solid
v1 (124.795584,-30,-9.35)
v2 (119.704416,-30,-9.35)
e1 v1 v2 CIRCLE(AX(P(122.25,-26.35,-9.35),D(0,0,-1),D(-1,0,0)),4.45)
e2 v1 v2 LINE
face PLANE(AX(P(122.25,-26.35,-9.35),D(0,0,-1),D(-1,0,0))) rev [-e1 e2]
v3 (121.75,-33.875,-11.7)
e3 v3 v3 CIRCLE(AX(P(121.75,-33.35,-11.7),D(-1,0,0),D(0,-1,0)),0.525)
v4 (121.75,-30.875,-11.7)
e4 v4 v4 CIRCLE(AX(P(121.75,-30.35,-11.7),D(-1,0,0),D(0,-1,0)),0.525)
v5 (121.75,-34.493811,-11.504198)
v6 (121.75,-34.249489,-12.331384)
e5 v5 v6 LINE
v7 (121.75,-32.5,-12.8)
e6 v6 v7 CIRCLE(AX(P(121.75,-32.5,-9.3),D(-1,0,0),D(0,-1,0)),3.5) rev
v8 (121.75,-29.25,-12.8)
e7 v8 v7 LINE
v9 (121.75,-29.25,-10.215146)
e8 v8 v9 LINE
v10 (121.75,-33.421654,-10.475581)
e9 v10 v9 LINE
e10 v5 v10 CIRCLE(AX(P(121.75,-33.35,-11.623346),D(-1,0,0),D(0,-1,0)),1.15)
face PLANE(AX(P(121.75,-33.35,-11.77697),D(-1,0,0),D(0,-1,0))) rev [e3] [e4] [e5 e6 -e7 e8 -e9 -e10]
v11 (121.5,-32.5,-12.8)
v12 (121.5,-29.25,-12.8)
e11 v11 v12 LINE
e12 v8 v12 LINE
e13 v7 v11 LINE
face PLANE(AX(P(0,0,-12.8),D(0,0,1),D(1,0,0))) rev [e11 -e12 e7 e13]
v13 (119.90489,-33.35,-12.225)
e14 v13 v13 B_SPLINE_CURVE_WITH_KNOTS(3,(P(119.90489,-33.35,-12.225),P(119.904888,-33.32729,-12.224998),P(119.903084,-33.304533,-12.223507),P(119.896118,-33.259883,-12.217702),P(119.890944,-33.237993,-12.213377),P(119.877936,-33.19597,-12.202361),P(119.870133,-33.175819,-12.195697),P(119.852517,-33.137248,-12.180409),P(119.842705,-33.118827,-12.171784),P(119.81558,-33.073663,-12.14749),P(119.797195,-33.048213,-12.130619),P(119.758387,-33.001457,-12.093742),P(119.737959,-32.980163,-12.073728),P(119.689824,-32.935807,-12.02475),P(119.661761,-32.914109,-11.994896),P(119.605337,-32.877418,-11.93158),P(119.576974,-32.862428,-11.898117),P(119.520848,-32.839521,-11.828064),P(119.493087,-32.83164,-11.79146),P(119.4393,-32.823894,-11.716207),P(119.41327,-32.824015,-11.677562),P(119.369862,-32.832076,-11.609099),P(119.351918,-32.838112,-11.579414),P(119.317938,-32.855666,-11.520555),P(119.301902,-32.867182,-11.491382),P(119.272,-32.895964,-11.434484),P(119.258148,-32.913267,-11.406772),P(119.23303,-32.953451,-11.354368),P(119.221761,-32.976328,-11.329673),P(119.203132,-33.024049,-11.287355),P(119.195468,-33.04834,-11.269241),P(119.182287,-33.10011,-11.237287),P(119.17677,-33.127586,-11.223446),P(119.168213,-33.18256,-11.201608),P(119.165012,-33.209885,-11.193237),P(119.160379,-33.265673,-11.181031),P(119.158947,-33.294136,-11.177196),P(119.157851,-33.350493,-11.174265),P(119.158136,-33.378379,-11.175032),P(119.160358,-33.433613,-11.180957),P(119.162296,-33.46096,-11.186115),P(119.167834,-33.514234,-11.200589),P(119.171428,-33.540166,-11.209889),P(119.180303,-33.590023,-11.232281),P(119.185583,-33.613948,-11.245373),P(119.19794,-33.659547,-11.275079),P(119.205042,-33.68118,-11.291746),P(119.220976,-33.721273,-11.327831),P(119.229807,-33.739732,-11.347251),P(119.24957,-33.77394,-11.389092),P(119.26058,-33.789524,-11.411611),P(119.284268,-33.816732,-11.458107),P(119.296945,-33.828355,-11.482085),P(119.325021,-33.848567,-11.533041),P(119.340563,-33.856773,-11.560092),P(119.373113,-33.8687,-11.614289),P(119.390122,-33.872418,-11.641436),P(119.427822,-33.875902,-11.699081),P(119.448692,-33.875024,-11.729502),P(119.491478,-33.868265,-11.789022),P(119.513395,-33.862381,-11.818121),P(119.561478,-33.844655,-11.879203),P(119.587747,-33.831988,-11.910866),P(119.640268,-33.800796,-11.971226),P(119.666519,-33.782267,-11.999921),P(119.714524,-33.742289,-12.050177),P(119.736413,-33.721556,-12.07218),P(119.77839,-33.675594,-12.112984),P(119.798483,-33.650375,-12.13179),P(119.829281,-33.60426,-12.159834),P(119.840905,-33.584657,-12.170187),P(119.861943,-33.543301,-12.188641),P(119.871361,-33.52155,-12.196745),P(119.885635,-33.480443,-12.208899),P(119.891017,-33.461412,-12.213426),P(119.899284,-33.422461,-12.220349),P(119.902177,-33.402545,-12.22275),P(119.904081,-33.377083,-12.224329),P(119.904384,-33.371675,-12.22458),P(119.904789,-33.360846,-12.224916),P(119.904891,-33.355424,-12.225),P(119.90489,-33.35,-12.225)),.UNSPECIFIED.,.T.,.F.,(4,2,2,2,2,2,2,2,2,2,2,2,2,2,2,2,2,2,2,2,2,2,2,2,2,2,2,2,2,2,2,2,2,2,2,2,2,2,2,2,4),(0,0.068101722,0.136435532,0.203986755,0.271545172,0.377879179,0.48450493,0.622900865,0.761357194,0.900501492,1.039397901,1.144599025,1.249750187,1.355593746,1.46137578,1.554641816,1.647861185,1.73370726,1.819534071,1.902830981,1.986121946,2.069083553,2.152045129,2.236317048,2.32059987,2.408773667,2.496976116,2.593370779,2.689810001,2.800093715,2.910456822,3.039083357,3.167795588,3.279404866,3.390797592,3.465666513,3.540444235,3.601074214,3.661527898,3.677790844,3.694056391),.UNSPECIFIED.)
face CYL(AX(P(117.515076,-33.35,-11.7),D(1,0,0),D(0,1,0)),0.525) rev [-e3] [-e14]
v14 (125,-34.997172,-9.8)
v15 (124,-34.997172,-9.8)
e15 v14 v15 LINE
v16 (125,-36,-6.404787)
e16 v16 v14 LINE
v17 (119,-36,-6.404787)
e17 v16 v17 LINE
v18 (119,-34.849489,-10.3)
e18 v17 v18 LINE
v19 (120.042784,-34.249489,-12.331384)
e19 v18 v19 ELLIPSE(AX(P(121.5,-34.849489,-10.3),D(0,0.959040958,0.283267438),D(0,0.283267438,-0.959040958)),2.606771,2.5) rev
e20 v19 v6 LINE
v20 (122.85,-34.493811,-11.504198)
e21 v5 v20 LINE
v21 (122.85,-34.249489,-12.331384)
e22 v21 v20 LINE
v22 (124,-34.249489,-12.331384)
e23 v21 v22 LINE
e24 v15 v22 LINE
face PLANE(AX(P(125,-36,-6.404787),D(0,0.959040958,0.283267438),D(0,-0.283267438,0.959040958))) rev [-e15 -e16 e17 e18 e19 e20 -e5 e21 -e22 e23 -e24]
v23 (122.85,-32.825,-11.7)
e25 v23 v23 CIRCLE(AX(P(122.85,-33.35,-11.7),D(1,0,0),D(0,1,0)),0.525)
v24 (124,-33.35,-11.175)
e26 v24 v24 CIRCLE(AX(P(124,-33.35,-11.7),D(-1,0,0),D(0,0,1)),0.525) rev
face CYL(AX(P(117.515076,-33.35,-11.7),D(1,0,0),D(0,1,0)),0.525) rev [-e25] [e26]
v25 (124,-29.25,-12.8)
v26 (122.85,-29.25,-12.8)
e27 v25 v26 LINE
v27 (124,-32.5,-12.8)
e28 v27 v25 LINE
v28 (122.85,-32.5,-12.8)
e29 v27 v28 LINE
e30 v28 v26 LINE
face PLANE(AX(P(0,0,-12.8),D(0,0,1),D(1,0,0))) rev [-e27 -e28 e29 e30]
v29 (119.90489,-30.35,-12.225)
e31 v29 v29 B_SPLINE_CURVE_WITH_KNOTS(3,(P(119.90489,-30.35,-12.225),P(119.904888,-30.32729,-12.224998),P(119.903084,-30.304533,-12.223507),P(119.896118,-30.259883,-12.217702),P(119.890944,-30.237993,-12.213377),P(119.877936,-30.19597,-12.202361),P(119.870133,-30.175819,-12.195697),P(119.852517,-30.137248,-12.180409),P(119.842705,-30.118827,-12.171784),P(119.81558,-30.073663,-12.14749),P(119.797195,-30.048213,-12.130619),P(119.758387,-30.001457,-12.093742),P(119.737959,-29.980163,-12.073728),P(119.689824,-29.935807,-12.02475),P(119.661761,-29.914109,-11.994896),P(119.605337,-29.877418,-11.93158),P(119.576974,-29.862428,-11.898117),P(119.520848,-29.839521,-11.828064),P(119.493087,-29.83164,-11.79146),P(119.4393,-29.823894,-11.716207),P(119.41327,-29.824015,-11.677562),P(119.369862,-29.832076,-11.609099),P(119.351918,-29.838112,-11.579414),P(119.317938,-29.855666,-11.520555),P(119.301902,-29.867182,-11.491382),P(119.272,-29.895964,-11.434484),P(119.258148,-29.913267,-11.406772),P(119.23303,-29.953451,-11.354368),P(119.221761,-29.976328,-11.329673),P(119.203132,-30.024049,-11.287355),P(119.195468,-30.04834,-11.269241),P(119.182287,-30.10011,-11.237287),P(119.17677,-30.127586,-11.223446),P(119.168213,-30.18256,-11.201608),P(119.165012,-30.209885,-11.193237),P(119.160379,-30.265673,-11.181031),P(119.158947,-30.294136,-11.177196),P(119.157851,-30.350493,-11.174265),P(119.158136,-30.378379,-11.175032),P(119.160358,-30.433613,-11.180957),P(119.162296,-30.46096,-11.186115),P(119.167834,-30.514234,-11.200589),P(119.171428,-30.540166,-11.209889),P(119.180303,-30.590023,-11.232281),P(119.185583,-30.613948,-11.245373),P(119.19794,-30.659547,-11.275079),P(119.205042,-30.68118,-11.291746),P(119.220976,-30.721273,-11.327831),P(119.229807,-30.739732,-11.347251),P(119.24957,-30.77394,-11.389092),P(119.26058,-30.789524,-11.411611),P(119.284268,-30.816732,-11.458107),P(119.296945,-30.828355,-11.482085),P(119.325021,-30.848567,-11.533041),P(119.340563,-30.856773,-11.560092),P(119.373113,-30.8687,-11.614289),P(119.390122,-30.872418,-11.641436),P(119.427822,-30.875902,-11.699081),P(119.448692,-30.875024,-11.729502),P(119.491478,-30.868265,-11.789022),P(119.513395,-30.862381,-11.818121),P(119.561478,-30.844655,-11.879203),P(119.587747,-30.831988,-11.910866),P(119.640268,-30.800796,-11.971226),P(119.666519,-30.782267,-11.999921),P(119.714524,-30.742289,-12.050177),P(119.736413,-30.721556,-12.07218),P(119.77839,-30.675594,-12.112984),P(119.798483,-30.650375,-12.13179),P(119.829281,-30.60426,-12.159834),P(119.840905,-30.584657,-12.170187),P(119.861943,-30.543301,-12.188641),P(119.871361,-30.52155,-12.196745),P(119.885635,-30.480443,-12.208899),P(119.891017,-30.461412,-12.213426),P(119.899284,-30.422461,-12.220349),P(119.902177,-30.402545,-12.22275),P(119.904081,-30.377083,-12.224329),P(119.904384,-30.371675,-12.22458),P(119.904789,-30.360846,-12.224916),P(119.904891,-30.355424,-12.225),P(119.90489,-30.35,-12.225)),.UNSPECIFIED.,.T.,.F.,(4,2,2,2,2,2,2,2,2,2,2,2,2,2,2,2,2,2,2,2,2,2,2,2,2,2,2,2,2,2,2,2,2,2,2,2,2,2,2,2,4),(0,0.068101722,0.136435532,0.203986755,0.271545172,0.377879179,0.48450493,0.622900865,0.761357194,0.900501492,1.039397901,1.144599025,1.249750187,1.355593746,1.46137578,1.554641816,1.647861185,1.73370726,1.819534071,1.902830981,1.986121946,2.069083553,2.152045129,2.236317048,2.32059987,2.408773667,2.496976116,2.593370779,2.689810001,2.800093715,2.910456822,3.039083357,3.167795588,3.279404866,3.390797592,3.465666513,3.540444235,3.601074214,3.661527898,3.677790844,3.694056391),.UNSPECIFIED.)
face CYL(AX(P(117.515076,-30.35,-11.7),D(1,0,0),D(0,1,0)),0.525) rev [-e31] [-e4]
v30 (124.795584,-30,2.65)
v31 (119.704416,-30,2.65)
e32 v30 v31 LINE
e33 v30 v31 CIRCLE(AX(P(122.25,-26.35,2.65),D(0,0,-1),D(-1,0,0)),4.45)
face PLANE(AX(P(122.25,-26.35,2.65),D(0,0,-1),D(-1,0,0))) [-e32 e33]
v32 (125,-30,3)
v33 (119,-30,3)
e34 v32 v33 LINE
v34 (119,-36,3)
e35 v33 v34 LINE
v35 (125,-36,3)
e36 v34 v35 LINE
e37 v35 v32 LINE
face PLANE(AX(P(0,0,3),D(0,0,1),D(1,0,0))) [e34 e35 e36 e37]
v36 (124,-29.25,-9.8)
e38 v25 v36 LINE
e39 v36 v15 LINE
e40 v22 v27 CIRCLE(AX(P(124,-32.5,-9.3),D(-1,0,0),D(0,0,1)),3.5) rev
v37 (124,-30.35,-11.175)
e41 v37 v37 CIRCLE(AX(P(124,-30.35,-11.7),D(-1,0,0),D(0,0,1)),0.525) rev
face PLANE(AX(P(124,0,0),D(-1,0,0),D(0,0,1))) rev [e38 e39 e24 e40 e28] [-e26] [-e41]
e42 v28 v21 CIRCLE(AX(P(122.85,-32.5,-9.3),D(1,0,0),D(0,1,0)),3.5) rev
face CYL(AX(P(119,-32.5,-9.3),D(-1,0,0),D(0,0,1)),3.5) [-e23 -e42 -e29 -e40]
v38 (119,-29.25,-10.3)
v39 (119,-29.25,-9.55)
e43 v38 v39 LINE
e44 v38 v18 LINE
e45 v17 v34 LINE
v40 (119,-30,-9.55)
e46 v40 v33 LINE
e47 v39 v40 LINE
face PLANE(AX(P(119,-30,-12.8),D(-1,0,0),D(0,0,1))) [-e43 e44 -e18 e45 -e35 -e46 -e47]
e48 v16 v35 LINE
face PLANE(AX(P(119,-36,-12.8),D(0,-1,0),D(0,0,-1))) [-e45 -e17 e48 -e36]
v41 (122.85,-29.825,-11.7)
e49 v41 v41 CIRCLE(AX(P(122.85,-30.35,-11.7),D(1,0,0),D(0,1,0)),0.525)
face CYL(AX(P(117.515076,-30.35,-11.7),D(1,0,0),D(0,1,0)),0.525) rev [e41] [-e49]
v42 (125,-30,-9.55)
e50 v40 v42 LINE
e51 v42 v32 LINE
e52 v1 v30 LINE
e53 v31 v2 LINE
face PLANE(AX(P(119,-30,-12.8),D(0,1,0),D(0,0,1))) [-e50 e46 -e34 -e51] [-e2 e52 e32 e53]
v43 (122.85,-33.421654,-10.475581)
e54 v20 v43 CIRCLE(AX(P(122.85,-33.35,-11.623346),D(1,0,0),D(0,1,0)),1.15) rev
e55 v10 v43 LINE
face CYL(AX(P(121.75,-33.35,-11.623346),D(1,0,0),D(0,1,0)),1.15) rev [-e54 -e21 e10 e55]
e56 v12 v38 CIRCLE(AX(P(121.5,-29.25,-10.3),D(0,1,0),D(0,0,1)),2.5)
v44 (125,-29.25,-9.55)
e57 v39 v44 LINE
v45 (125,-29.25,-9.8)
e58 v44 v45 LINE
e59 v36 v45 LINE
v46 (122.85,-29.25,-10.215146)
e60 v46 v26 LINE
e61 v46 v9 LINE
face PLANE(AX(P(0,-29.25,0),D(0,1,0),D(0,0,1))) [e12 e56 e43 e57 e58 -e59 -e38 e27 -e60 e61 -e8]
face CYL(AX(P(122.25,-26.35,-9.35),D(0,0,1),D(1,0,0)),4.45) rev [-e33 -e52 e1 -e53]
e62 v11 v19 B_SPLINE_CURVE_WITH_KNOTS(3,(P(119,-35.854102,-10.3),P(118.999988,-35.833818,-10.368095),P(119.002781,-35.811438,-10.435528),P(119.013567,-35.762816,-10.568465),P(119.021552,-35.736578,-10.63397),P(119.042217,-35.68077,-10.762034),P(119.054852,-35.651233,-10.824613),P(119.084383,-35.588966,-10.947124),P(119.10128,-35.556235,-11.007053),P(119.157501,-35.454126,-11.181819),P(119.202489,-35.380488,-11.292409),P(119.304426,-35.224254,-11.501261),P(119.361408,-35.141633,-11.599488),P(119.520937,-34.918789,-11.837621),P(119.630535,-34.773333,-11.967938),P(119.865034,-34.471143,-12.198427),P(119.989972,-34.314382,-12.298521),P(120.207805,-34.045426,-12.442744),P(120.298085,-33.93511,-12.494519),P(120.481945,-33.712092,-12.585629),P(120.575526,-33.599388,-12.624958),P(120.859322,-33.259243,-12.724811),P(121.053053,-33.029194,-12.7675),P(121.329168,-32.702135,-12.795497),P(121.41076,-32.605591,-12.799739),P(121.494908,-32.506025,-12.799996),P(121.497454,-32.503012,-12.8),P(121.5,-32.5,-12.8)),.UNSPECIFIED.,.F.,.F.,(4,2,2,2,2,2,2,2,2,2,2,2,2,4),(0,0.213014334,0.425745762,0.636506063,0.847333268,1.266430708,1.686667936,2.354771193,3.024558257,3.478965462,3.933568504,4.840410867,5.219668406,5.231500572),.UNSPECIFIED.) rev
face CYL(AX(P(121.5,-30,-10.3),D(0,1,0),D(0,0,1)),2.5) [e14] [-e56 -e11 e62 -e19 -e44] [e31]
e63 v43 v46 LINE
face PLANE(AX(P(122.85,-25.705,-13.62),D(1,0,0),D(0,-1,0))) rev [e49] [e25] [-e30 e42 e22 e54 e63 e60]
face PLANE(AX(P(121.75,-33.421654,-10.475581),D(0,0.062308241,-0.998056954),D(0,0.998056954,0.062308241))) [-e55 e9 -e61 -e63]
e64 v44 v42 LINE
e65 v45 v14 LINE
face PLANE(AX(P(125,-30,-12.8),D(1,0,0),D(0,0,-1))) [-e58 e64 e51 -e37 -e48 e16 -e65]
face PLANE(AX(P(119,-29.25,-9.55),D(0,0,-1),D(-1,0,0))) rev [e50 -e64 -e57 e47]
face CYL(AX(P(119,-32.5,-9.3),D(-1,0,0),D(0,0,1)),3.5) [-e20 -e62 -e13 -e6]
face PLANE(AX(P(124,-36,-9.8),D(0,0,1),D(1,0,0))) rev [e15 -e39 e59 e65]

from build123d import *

# Parameters (mm, degrees)
BOSS_EXTRUDE1_DEPTH            = 3
BOSS_EXTRUDE1_DEPTH_BACK       = 12.8
SKETCH1_W                      = 6
SKETCH1_H                      = 6
SKETCH10_W                     = 6
SKETCH10_H                     = 3.25
BOSS_EXTRUDE2_DEPTH            = 0.75
CUT_EXTRUDE2_DEPTH             = 0.1
CUT_EXTRUDE2_DEPTH_BACK        = 1
CUT_EXTRUDE3_DEPTH             = 5.5
CUT_EXTRUDE3_DEPTH_BACK        = 6.5
SKETCH5_R                      = 4.45
CUT_EXTRUDE4_REACH             = 40.346
SKETCH7_R                      = 0.525
CUT_EXTRUDE4_DIRECTION_2_REACH = 40.346
SKETCH8_W                      = 3
SKETCH8_H                      = 6.75
CUT_EXTRUDE5_DEPTH             = 1
FILLET1_R                      = 3.5
FILLET1_R_2                    = 2.5
CUT_EXTRUDE7_DEPTH             = 39.676090947


with BuildPart() as part:
    # Sketch1 → Boss-Extrude1 (new, two sides: drawn at the far end of the back side and taken through both)
    with BuildSketch(Plane.XY.offset(-BOSS_EXTRUDE1_DEPTH_BACK)):
        with Locations((122, -33)):
            Rectangle(SKETCH1_W, SKETCH1_H)
    extrude(amount=BOSS_EXTRUDE1_DEPTH + BOSS_EXTRUDE1_DEPTH_BACK)

    # Sketch10 → Boss-Extrude2 (add)
    with BuildSketch(Plane(origin=(0, -30, 0), x_dir=(1, 0, 0), z_dir=(0, 1, 0))):
        with Locations((122, 11.175)):
            Rectangle(SKETCH10_W, SKETCH10_H)
    extrude(amount=BOSS_EXTRUDE2_DEPTH)

    # Sketch4 → Cut-Extrude2 (cut, two sides: drawn at the far end of the back side and taken through both)
    with BuildSketch(Plane.ZY.offset(-121.85).offset(-CUT_EXTRUDE2_DEPTH_BACK)):
        with BuildLine():
            Line((-11.776969868, -34.5), (-11.623346252, -34.5))
            ThreePointArc((-11.623346252, -34.5), (-10.835914556, -34.188123693), (-10.475580755, -33.421654477))
            Line((-10.475580755, -33.421654477), (-10.040343544, -26.45))
            Line((-10.040343544, -26.45), (-13.359649062, -26.45))
            Line((-13.359649062, -26.45), (-12.924738676, -33.421601422))
            ThreePointArc((-12.924738676, -33.421601422), (-12.564420934, -34.188105493), (-11.776969868, -34.5))
        make_face()
    extrude(amount=CUT_EXTRUDE2_DEPTH + CUT_EXTRUDE2_DEPTH_BACK, mode=Mode.SUBTRACT)

    # Sketch5 → Cut-Extrude3 (cut, two sides: drawn at the far end of the back side and taken through both)
    with BuildSketch(Plane(origin=(0, 0, -3.85), x_dir=(-1, 0, 0), z_dir=(0, 0, -1)).offset(-CUT_EXTRUDE3_DEPTH_BACK)):
        with Locations((-122.25, -26.35)):
            Circle(SKETCH5_R)
    extrude(amount=CUT_EXTRUDE3_DEPTH + CUT_EXTRUDE3_DEPTH_BACK, mode=Mode.SUBTRACT)

    # Cut-Extrude4: up to this face of the body (flat: up to its plane)
    cut_extrude4_end = Plane(part.part.faces().sort_by_distance((119, -32.915397223, -5.057298496))[0])
    # Sketch7 → Cut-Extrude4 (cut, up to the picked face)
    with BuildSketch(Plane(origin=(121.75, 0, 0), x_dir=(0, 0, -1), z_dir=(1, 0, 0)), mode=Mode.PRIVATE) as cut_extrude4_sk1:
        with Locations(Location((11.7, -33.35, 0), (0, 0, 90))):
            Circle(SKETCH7_R)
    cut_extrude4_tool1 = split(extrude(cut_extrude4_sk1.sketch, amount=-CUT_EXTRUDE4_REACH, mode=Mode.PRIVATE), bisect_by=cut_extrude4_end, keep=Keep.BOTH, mode=Mode.PRIVATE)
    # Sketch7 → Cut-Extrude4 (cut, up to the picked face)
    with BuildSketch(Plane(origin=(121.75, 0, 0), x_dir=(0, 0, -1), z_dir=(1, 0, 0)), mode=Mode.PRIVATE) as cut_extrude4_sk2:
        with Locations(Location((11.7, -30.35, 0), (0, 0, 90))):
            Circle(SKETCH7_R)
    cut_extrude4_tool2 = split(extrude(cut_extrude4_sk2.sketch, amount=-CUT_EXTRUDE4_REACH, mode=Mode.PRIVATE), bisect_by=cut_extrude4_end, keep=Keep.BOTH, mode=Mode.PRIVATE)
    add(cut_extrude4_tool1.solids().sort_by(Axis((121.75, -33.35, -11.7), (-1, 0, 0)))[0], mode=Mode.SUBTRACT)
    add(cut_extrude4_tool2.solids().sort_by(Axis((121.75, -30.35, -11.7), (-1, 0, 0)))[0], mode=Mode.SUBTRACT)

    # Cut-Extrude4 direction 2: up to this face of the body (flat: up to its plane)
    cut_extrude4_direction_2_end = Plane(part.part.faces().sort_by_distance((125, -32.915397223, -5.057298496))[0])
    # Sketch7 → Cut-Extrude4 direction 2 (cut, up to the picked face)
    with BuildSketch(Plane(origin=(121.75, 0, 0), x_dir=(0, 0, -1), z_dir=(1, 0, 0)), mode=Mode.PRIVATE) as cut_extrude4_direction_2_sk1:
        with Locations(Location((11.7, -33.35, 0), (0, 0, 90))):
            Circle(SKETCH7_R)
    cut_extrude4_direction_2_tool1 = split(extrude(cut_extrude4_direction_2_sk1.sketch, amount=CUT_EXTRUDE4_DIRECTION_2_REACH, mode=Mode.PRIVATE), bisect_by=cut_extrude4_direction_2_end, keep=Keep.BOTH, mode=Mode.PRIVATE)
    # Sketch7 → Cut-Extrude4 direction 2 (cut, up to the picked face)
    with BuildSketch(Plane(origin=(121.75, 0, 0), x_dir=(0, 0, -1), z_dir=(1, 0, 0)), mode=Mode.PRIVATE) as cut_extrude4_direction_2_sk2:
        with Locations(Location((11.7, -30.35, 0), (0, 0, 90))):
            Circle(SKETCH7_R)
    cut_extrude4_direction_2_tool2 = split(extrude(cut_extrude4_direction_2_sk2.sketch, amount=CUT_EXTRUDE4_DIRECTION_2_REACH, mode=Mode.PRIVATE), bisect_by=cut_extrude4_direction_2_end, keep=Keep.BOTH, mode=Mode.PRIVATE)
    add(cut_extrude4_direction_2_tool1.solids().sort_by(Axis((121.75, -33.35, -11.7), (1, 0, 0)))[0], mode=Mode.SUBTRACT)
    add(cut_extrude4_direction_2_tool2.solids().sort_by(Axis((121.75, -30.35, -11.7), (1, 0, 0)))[0], mode=Mode.SUBTRACT)

    # Sketch8 → Cut-Extrude5 (cut)
    with BuildSketch(Plane(origin=(125, 0, 0), x_dir=(0, 0, -1), z_dir=(1, 0, 0))):
        with Locations((11.3, -32.625)):
            Rectangle(SKETCH8_W, SKETCH8_H)
    extrude(amount=-CUT_EXTRUDE5_DEPTH, mode=Mode.SUBTRACT)

    # Fillet1
    # the kernel refuses this fillet: 3.5, 2.5 mm, written as the material it takes off along each edge
    with BuildSketch(Plane(origin=(132.75, -36, -12.8), x_dir=(0, 0, 1), z_dir=(-1, 0, 0))) as fillet1_piece_1:
        with BuildLine():
            CenterArc((FILLET1_R, FILLET1_R), FILLET1_R, 180, 90)
            Line((0, FILLET1_R), (0, 0))
            Line((0, 0), (FILLET1_R, 0))
        make_face()
    extrude(amount=22.5, mode=Mode.SUBTRACT)
    # the kernel refuses this fillet: 3.5, 2.5 mm, written as the material it takes off along each edge
    with BuildSketch(Plane(origin=(119, -23, -12.8), x_dir=(0, 0, 1), z_dir=(0, -1, 0))) as fillet1_2_piece_1:
        with BuildLine():
            CenterArc((FILLET1_R_2, -FILLET1_R_2), FILLET1_R_2, 90, 90)
            Line((0, -FILLET1_R_2), (0, 0))
            Line((0, 0), (FILLET1_R_2, 0))
        make_face()
    extrude(amount=15.75, mode=Mode.SUBTRACT)

    # Sketch12 → Cut-Extrude7 (cut, through all)
    with BuildSketch(Plane.ZY.offset(-119)):
        Polygon((-6.404787377, -36), (-12.404787377, -34.227808088), (-12.404787377, -36), align=None)
    extrude(amount=-CUT_EXTRUDE7_DEPTH, mode=Mode.SUBTRACT)


solid = part.part
